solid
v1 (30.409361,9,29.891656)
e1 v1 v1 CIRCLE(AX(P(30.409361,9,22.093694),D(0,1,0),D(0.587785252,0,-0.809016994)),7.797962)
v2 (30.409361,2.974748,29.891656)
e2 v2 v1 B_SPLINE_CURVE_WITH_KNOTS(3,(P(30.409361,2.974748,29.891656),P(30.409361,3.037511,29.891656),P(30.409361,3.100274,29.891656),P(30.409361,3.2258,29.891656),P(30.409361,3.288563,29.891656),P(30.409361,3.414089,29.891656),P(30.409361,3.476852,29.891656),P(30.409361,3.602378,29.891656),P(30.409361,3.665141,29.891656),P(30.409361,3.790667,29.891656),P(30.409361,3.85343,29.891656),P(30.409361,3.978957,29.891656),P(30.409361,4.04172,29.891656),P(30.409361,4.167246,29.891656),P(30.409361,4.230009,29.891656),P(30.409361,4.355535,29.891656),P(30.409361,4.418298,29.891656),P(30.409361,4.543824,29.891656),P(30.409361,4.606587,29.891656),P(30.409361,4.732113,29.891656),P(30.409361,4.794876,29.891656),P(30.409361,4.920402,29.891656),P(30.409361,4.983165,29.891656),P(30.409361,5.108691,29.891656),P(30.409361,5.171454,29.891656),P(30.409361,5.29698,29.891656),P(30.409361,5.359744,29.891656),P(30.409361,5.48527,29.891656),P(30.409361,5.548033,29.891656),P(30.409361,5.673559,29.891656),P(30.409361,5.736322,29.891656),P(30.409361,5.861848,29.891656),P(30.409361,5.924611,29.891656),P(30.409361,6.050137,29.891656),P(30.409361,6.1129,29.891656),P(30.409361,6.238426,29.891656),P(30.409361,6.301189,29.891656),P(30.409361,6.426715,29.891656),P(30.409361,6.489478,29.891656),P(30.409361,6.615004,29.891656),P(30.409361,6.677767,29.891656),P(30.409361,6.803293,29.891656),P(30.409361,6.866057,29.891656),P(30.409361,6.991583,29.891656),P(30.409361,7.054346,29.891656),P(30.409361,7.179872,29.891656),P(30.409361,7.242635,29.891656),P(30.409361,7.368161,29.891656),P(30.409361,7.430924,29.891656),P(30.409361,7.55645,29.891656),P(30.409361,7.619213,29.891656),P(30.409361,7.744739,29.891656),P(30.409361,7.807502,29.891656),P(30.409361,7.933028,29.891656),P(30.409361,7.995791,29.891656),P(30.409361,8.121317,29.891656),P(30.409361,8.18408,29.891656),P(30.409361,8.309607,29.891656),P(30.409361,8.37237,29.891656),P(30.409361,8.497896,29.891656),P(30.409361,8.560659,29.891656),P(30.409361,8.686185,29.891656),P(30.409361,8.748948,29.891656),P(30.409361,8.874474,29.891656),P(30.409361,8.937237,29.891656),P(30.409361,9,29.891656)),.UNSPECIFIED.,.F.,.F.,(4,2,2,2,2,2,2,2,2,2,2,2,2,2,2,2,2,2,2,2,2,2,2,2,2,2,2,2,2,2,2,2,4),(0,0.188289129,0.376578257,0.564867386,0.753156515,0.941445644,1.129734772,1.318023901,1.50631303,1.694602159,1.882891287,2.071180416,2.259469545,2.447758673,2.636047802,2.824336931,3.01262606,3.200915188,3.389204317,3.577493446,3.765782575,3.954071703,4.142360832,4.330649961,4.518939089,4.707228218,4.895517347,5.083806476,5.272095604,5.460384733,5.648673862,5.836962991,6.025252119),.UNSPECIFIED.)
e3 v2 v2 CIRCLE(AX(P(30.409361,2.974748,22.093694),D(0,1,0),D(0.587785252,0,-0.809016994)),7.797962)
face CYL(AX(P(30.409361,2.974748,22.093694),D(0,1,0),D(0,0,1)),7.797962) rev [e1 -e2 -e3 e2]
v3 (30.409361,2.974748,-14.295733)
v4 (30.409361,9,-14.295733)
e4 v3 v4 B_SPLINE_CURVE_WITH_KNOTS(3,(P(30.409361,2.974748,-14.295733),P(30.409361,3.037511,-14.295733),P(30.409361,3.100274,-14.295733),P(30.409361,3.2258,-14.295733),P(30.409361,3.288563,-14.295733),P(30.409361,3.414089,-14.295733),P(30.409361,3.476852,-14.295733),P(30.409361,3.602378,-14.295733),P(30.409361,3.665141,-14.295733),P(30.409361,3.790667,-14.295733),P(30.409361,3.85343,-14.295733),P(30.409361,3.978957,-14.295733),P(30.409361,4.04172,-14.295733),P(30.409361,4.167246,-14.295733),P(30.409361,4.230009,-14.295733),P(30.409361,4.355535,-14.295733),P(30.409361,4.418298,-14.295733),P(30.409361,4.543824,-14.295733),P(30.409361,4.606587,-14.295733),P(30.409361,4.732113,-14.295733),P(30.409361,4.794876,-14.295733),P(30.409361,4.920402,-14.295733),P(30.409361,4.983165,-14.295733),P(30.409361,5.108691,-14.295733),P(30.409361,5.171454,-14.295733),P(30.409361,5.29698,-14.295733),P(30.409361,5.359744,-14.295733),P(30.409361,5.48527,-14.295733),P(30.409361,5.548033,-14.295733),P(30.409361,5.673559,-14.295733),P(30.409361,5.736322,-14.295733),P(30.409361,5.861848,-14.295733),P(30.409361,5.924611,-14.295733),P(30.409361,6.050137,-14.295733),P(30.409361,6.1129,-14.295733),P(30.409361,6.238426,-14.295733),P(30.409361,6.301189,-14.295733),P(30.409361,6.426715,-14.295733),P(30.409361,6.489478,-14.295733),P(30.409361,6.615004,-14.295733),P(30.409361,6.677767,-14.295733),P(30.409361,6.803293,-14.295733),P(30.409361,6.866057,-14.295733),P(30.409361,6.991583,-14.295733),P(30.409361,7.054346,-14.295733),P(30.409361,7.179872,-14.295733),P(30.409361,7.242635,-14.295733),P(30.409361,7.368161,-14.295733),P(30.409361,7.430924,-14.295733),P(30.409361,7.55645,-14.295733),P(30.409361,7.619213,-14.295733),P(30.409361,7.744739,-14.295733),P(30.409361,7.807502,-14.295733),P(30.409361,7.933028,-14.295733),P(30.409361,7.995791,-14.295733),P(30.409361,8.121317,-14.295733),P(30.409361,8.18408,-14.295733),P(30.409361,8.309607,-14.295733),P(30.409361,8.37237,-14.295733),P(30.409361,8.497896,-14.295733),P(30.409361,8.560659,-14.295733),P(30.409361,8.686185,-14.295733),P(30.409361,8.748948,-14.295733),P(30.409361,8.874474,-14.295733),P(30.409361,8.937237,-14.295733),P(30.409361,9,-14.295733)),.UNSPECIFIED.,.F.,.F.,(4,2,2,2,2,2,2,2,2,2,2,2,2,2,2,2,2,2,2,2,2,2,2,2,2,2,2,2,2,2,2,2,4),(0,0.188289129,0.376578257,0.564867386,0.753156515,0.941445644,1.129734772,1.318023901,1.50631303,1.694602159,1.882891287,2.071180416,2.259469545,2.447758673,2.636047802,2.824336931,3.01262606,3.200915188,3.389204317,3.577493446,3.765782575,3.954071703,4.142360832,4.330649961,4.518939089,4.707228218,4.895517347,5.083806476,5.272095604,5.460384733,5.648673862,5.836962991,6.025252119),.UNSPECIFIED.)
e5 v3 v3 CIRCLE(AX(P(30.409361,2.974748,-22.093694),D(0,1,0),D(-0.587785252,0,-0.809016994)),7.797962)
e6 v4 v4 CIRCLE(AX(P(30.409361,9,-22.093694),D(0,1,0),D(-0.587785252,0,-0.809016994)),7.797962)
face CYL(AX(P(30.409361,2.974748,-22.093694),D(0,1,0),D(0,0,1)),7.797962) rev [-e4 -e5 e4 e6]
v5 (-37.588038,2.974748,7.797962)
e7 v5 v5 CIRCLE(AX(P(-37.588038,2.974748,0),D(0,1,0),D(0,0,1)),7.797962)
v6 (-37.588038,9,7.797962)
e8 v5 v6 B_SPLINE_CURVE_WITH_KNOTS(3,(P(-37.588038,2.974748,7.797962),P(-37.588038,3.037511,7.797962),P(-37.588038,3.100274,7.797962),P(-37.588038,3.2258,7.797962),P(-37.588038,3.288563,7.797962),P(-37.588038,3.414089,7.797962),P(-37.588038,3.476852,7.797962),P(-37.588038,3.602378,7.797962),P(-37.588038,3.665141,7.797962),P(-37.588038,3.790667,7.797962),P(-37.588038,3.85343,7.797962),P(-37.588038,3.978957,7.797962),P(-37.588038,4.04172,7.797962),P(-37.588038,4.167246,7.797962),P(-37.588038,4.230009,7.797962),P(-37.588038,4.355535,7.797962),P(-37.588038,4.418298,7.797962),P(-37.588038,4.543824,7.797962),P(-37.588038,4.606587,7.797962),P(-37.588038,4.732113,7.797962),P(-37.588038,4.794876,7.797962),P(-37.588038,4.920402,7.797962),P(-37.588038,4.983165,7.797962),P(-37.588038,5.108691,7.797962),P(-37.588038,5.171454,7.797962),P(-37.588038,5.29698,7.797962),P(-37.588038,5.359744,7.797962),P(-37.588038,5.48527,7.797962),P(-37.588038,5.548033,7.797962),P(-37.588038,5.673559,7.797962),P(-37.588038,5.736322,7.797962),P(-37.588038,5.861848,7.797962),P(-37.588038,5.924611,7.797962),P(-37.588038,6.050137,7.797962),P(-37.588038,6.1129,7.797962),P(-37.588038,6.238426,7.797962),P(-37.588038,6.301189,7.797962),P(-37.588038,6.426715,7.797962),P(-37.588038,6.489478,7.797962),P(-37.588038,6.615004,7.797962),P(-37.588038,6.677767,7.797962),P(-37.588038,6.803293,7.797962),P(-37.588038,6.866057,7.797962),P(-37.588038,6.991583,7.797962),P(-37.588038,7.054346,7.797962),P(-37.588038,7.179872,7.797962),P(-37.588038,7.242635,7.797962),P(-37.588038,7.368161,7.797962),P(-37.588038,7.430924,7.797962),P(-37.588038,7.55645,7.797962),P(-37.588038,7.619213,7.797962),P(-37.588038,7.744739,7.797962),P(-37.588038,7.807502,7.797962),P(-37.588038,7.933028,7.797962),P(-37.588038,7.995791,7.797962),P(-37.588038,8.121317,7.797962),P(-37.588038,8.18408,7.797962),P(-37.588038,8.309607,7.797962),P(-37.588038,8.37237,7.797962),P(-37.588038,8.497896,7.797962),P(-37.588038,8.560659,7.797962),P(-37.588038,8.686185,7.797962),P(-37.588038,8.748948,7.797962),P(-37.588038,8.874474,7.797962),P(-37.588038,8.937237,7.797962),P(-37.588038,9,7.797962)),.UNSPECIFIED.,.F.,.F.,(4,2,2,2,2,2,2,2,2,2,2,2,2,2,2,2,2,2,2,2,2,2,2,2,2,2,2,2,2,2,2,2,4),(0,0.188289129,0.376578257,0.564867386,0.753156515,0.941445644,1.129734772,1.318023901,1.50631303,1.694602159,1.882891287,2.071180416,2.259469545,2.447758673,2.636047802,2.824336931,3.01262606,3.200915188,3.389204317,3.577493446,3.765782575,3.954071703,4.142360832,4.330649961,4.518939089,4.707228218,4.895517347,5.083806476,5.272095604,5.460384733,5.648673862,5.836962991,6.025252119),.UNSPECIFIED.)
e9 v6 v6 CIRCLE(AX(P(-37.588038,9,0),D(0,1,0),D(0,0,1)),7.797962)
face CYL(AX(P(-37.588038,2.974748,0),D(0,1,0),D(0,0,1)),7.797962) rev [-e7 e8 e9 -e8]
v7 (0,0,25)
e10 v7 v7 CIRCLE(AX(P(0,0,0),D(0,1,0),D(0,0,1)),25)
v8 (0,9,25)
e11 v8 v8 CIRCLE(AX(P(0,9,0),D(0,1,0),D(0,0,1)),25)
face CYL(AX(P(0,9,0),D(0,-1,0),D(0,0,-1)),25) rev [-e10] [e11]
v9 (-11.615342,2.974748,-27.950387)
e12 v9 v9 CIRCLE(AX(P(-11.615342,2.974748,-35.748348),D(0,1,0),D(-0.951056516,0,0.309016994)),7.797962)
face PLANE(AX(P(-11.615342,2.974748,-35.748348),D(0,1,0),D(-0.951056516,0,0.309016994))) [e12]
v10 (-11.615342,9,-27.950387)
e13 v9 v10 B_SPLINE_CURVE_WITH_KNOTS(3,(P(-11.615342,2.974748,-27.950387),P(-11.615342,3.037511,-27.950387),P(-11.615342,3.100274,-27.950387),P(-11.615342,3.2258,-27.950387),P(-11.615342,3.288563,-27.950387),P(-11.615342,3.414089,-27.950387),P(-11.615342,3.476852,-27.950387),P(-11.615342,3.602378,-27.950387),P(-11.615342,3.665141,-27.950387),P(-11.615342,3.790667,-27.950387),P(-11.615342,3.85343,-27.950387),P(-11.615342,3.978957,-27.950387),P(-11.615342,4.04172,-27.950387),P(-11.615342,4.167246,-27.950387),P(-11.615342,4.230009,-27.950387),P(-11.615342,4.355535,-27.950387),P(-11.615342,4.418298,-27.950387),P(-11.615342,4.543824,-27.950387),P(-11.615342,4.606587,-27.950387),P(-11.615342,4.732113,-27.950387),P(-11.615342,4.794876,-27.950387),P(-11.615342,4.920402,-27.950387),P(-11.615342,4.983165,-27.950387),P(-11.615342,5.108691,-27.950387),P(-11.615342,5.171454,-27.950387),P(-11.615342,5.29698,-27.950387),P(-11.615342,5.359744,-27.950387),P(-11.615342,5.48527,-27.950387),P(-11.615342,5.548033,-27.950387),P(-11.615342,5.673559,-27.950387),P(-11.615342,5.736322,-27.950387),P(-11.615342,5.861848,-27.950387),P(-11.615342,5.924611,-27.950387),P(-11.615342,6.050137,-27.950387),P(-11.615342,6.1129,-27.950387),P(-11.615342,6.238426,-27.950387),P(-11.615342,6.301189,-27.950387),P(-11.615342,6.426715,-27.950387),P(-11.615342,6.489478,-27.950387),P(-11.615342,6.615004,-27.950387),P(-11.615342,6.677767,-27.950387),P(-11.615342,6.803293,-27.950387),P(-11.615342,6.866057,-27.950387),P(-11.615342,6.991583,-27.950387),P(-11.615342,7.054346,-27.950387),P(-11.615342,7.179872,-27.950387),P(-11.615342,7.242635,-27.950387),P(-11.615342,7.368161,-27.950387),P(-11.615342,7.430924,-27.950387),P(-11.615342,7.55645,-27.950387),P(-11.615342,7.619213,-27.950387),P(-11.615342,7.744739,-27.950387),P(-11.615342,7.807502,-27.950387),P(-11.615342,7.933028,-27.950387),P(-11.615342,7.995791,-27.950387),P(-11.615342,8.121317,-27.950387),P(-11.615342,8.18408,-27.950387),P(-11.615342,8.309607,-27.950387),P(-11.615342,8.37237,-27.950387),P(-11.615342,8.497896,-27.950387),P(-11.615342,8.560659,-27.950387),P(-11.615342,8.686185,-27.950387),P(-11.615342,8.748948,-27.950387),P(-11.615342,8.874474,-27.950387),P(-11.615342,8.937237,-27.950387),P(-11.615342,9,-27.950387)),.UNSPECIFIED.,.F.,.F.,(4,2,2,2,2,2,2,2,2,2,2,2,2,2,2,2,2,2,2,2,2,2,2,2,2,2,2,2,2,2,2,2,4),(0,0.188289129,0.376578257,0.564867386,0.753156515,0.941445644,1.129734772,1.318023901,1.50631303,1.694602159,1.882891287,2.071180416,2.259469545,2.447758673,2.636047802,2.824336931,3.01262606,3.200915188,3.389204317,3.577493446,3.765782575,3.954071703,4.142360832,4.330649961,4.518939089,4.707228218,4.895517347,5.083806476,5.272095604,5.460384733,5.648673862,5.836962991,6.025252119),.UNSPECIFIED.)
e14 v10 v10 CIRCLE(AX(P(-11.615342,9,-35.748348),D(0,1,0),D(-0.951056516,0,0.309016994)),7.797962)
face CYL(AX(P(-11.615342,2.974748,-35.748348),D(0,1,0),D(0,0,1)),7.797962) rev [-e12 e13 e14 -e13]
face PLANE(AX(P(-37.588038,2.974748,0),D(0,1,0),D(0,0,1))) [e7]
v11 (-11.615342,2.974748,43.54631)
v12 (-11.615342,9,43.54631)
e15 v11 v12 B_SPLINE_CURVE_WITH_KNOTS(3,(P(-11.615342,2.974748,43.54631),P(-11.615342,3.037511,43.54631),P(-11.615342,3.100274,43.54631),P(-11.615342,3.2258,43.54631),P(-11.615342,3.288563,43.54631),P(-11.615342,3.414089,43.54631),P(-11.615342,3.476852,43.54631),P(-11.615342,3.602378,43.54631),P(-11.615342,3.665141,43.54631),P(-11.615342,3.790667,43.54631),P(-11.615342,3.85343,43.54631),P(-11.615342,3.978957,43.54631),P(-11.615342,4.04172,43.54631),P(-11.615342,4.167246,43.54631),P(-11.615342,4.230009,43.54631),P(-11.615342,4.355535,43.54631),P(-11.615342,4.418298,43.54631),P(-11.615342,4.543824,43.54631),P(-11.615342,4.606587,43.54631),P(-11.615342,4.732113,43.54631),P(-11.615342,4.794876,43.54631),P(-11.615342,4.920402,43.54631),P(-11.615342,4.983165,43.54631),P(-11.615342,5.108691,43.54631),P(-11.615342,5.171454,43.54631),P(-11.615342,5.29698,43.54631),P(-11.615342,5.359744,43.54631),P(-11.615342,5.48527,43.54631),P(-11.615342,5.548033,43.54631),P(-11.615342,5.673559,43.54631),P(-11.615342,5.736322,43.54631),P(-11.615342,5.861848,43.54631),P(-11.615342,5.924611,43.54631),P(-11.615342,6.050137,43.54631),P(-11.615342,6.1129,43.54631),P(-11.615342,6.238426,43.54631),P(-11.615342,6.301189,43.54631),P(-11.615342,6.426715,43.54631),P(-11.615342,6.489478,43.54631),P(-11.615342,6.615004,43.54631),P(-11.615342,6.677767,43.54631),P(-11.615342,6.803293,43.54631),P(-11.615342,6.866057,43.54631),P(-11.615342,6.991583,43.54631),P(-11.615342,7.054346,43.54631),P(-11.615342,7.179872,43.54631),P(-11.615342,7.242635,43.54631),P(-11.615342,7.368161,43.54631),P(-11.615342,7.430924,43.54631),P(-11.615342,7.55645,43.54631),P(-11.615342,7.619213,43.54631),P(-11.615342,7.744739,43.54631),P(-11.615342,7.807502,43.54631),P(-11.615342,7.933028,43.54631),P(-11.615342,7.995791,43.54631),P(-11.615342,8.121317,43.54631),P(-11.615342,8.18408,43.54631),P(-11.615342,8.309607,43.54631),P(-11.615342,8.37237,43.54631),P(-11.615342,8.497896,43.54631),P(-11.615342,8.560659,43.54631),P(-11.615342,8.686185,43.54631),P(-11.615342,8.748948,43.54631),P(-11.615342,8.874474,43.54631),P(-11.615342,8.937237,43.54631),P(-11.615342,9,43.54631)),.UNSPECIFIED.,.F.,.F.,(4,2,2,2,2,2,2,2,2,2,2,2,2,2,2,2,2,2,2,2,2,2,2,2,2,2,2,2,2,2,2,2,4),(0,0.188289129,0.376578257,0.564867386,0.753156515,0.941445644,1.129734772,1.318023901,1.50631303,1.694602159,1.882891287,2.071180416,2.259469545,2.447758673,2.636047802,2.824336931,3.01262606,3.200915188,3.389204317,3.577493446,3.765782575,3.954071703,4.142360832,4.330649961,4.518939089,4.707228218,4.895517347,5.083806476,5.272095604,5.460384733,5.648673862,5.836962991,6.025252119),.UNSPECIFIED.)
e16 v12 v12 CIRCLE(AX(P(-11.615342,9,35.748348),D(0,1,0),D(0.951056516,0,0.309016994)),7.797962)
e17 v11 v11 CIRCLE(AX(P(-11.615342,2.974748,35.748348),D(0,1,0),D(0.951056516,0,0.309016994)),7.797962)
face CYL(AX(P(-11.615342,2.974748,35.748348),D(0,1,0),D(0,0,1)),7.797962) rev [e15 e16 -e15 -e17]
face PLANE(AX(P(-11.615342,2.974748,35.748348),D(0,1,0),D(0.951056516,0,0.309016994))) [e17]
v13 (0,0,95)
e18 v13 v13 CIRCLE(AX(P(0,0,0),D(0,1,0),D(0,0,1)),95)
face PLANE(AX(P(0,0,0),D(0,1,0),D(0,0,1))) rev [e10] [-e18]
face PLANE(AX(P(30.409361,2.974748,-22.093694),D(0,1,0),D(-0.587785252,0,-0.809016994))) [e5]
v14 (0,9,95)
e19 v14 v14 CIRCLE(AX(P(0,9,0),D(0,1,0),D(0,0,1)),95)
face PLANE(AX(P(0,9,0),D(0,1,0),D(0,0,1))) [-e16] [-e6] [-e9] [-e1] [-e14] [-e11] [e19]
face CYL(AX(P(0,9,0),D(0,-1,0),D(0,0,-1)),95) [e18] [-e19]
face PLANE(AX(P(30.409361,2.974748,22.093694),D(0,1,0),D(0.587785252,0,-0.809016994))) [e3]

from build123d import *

# Parameters (mm, degrees)
SKETCH1_R           = 95
BOSS_EXTRUDE1_DEPTH = 9
SKETCH2_R           = 25
CUT_EXTRUDE1_DEPTH  = 135.651401775
SKETCH3_R           = 7.797961819
CUT_EXTRUDE2_DEPTH  = 6.025252119
CIRPATTERN1_COUNT   = 5


with BuildPart() as part:
    # Sketch1 → Boss-Extrude1 (new body)
    with BuildSketch(Plane(origin=(0, 0, 0), x_dir=(1, 0, 0), z_dir=(0, 1, 0))):
        Circle(SKETCH1_R)
    extrude(amount=BOSS_EXTRUDE1_DEPTH)

    # Sketch2 → Cut-Extrude1 (cut, through all)
    with BuildSketch(Plane(origin=(0, 0, 0), x_dir=(1, 0, 0), z_dir=(0, 1, 0))):
        Circle(SKETCH2_R)
    extrude(amount=CUT_EXTRUDE1_DEPTH, mode=Mode.SUBTRACT)

    # Sketch3 → Cut-Extrude2 (cut)
    with BuildSketch(Plane(origin=(0, 9, 0), x_dir=(1, 0, 0), z_dir=(0, 1, 0))):
        with Locations((-37.588037911, 0)):
            Circle(SKETCH3_R)
    cut_extrude2 = extrude(amount=-CUT_EXTRUDE2_DEPTH, mode=Mode.SUBTRACT)

    # CirPattern1: Cut-Extrude2 ×5 about axis
    cirpattern1_axis = Axis((0, 0, 0), (0, 1, 0))
    for i in range(1, CIRPATTERN1_COUNT):
        add(cut_extrude2.rotate(cirpattern1_axis, i * 360 / CIRPATTERN1_COUNT), mode=Mode.SUBTRACT)


solid = part.part
